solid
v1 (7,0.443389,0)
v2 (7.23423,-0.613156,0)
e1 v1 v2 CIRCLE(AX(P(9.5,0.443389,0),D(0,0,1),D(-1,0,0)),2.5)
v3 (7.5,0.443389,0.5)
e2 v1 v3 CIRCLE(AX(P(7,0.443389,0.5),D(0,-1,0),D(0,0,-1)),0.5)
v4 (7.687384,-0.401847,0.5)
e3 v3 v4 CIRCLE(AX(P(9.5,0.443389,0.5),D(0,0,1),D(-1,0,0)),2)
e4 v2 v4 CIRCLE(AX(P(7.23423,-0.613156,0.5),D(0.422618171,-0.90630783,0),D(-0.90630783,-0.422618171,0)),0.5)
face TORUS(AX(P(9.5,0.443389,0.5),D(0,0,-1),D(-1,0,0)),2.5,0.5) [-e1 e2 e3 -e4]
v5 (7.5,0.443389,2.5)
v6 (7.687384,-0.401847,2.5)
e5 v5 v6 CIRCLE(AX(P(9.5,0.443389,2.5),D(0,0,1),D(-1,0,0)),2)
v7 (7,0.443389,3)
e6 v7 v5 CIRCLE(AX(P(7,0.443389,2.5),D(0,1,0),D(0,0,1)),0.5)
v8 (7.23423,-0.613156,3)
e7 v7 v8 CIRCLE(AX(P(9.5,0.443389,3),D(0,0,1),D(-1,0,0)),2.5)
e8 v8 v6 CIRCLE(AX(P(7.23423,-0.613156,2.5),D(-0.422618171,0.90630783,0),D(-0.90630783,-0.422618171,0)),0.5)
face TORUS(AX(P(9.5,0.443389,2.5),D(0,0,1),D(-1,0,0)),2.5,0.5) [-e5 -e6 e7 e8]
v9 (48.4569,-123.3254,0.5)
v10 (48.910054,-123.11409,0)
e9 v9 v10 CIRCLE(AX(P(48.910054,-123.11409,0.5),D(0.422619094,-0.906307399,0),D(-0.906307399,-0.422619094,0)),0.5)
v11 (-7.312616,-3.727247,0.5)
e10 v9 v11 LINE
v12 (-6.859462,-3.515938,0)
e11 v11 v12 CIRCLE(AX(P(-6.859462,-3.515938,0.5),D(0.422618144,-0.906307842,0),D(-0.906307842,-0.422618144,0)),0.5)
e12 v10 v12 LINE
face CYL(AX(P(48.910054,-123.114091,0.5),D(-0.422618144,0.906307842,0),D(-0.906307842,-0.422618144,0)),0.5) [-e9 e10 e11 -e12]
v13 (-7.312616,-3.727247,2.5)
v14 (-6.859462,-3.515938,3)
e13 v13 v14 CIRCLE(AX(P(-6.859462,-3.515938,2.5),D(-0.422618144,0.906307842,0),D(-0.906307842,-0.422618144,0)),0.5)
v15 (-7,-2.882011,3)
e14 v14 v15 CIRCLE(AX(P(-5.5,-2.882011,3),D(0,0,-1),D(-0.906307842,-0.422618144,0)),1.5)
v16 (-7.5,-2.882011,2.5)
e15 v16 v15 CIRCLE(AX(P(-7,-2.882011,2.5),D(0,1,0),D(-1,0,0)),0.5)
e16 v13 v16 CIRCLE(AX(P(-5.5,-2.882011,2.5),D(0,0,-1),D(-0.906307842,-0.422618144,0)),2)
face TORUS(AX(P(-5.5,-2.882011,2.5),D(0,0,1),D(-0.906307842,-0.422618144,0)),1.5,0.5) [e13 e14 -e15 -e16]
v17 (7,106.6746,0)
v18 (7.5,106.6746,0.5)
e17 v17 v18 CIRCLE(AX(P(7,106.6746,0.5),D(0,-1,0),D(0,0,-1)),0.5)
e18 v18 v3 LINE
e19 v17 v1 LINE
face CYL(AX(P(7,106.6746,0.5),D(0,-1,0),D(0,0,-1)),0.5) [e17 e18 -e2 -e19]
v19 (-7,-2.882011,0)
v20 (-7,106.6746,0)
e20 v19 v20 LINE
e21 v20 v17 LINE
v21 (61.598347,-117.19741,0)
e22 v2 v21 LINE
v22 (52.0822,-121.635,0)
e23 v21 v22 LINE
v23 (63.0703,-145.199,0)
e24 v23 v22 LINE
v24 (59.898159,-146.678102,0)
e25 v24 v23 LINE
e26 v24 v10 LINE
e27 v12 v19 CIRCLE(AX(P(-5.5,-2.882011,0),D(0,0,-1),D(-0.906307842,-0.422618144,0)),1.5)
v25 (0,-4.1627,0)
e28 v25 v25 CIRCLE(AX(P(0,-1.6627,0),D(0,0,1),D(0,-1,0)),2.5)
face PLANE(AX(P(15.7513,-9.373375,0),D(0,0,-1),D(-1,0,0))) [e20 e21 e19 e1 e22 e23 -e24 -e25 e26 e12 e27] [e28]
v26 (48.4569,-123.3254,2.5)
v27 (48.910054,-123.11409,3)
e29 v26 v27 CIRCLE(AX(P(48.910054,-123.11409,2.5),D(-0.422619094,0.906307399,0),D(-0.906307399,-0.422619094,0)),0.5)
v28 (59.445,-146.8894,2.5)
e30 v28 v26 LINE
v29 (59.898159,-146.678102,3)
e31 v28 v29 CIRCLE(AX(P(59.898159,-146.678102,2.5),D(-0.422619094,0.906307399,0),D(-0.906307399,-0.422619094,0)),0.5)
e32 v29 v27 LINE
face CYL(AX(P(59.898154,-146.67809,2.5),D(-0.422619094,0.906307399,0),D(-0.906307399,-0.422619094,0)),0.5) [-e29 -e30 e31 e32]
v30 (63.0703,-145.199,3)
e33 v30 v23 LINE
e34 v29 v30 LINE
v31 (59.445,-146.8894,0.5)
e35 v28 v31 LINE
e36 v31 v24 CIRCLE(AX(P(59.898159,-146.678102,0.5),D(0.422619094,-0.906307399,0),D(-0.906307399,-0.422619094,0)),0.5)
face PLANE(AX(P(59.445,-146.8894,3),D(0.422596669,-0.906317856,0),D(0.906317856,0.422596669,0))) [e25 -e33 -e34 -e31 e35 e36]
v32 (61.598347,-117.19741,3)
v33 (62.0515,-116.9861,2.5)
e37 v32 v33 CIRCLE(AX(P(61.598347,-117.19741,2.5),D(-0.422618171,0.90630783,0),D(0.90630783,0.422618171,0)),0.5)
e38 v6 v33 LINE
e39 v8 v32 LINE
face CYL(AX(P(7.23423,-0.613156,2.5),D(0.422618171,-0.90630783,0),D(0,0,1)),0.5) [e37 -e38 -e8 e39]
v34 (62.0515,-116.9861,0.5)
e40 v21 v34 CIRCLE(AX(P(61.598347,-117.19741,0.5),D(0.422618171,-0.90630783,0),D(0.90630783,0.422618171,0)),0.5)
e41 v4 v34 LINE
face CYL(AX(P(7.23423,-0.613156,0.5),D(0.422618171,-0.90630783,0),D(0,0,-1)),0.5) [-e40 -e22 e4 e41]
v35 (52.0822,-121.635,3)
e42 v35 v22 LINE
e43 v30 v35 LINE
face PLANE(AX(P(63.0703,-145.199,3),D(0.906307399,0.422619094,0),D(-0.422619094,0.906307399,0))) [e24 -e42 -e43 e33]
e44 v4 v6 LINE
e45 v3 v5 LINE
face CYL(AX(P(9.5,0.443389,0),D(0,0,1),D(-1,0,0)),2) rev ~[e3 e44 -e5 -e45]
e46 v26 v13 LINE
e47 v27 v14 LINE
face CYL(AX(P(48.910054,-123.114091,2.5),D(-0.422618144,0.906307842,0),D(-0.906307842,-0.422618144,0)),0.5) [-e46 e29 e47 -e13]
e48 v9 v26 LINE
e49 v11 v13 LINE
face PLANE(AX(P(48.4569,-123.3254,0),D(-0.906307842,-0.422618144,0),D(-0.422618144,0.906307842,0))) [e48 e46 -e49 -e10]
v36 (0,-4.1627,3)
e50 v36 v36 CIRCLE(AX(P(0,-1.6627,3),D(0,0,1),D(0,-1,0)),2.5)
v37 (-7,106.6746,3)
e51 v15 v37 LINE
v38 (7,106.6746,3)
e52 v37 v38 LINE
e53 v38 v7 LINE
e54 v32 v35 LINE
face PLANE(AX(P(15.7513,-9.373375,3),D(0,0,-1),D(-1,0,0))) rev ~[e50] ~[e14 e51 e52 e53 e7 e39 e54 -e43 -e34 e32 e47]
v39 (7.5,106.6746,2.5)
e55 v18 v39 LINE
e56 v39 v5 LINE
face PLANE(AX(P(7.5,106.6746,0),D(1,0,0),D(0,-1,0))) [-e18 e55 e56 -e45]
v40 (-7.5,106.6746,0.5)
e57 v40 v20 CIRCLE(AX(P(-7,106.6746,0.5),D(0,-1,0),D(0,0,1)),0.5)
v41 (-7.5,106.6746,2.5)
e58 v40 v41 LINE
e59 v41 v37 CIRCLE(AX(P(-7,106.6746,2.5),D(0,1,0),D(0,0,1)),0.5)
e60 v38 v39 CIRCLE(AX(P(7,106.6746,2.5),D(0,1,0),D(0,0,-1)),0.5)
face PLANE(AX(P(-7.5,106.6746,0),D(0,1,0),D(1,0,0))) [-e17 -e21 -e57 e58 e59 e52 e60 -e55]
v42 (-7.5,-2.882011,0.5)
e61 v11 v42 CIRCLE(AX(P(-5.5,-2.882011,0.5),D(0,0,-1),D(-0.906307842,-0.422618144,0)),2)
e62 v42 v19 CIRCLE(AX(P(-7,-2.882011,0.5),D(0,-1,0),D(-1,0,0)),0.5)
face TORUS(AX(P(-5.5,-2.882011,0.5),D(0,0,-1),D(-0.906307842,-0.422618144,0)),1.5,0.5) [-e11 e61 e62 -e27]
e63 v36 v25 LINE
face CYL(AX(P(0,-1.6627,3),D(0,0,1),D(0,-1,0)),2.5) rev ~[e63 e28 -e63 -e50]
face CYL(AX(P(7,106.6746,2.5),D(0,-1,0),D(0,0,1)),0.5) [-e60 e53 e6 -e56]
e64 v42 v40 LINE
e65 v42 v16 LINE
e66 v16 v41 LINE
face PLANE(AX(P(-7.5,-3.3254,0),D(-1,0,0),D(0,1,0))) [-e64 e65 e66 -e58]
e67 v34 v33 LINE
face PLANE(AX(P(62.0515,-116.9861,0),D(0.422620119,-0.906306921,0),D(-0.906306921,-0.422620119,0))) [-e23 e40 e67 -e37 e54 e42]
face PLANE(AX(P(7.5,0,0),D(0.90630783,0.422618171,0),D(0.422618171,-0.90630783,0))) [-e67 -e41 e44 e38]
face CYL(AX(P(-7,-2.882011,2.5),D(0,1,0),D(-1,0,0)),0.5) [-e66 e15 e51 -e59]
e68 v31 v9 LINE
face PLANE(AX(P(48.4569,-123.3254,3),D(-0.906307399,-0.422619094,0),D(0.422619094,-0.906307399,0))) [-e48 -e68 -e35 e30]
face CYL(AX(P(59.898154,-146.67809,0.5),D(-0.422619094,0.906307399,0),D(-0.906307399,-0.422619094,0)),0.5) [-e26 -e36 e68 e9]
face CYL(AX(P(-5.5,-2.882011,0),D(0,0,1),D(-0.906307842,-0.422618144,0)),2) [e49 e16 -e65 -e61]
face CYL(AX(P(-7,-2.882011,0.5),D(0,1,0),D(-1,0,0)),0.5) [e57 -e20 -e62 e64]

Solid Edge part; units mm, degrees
sketch "Sketch1" plane through (0, 0, 0) normal (0, 0, 1) x (1, 0, 0)
  line L0 (48.4569, -123.3254) -> (-7.5, -3.3254)
  line L1 (-7.5, -3.3254) -> (-7.5, 106.6746)
  line L2 (-7.5, 106.6746) -> (7.5, 106.6746)
  line L3 (7.5, 106.6746) -> (7.5, 0)
  line L4 (7.5, 0) -> (62.0515, -116.9861)
  line L5 (62.0515, -116.9861) -> (48.4569, -123.3254)
extrude "Protrusion1" add sketch "Sketch1" along normal blind 3
sketch "Sketch2" plane through (33.3013, -25.359, 3) normal (0, 0, 1) x (0, -1, 0)
  line L0 (121.5304, 26.1437) -> (119.84, 29.769)
  line L1 (119.84, 29.769) -> (96.276, 18.7809)
  line L2 (96.276, 18.7809) -> (97.9664, 15.1556)
  line L3 (97.9664, 15.1556) -> (121.5304, 26.1437)
extrude "Protrusion2" add sketch "Sketch2" against normal up to surface (3 mm away)
sketch "Sketch3" plane through (35.3731, -35.2776, 3) normal (0, 0, 1) x (0, -1, 0)
  circle A0 centre (-33.6149, -35.3731) radius 2.5
extrude "Cutout1" cut sketch "Sketch3" against normal up to next
fillet "Arrondis_angles" radius 2 2 edges at (-7.5, -3.3254, 1.5) (7.5, 0, 1.5)
fillet "Arrondis_0" radius 0.5 8 edges at (26.0662, -75.3083, 0) (26.0662, -75.3083, 3) (34.8695, -58.694, 0) (34.8695, -58.694, 3) (-7.5, 51.8963, 3) (7.5, 53.559, 3) (7.5, 53.559, 0) (-7.5, 51.8963, 0)
